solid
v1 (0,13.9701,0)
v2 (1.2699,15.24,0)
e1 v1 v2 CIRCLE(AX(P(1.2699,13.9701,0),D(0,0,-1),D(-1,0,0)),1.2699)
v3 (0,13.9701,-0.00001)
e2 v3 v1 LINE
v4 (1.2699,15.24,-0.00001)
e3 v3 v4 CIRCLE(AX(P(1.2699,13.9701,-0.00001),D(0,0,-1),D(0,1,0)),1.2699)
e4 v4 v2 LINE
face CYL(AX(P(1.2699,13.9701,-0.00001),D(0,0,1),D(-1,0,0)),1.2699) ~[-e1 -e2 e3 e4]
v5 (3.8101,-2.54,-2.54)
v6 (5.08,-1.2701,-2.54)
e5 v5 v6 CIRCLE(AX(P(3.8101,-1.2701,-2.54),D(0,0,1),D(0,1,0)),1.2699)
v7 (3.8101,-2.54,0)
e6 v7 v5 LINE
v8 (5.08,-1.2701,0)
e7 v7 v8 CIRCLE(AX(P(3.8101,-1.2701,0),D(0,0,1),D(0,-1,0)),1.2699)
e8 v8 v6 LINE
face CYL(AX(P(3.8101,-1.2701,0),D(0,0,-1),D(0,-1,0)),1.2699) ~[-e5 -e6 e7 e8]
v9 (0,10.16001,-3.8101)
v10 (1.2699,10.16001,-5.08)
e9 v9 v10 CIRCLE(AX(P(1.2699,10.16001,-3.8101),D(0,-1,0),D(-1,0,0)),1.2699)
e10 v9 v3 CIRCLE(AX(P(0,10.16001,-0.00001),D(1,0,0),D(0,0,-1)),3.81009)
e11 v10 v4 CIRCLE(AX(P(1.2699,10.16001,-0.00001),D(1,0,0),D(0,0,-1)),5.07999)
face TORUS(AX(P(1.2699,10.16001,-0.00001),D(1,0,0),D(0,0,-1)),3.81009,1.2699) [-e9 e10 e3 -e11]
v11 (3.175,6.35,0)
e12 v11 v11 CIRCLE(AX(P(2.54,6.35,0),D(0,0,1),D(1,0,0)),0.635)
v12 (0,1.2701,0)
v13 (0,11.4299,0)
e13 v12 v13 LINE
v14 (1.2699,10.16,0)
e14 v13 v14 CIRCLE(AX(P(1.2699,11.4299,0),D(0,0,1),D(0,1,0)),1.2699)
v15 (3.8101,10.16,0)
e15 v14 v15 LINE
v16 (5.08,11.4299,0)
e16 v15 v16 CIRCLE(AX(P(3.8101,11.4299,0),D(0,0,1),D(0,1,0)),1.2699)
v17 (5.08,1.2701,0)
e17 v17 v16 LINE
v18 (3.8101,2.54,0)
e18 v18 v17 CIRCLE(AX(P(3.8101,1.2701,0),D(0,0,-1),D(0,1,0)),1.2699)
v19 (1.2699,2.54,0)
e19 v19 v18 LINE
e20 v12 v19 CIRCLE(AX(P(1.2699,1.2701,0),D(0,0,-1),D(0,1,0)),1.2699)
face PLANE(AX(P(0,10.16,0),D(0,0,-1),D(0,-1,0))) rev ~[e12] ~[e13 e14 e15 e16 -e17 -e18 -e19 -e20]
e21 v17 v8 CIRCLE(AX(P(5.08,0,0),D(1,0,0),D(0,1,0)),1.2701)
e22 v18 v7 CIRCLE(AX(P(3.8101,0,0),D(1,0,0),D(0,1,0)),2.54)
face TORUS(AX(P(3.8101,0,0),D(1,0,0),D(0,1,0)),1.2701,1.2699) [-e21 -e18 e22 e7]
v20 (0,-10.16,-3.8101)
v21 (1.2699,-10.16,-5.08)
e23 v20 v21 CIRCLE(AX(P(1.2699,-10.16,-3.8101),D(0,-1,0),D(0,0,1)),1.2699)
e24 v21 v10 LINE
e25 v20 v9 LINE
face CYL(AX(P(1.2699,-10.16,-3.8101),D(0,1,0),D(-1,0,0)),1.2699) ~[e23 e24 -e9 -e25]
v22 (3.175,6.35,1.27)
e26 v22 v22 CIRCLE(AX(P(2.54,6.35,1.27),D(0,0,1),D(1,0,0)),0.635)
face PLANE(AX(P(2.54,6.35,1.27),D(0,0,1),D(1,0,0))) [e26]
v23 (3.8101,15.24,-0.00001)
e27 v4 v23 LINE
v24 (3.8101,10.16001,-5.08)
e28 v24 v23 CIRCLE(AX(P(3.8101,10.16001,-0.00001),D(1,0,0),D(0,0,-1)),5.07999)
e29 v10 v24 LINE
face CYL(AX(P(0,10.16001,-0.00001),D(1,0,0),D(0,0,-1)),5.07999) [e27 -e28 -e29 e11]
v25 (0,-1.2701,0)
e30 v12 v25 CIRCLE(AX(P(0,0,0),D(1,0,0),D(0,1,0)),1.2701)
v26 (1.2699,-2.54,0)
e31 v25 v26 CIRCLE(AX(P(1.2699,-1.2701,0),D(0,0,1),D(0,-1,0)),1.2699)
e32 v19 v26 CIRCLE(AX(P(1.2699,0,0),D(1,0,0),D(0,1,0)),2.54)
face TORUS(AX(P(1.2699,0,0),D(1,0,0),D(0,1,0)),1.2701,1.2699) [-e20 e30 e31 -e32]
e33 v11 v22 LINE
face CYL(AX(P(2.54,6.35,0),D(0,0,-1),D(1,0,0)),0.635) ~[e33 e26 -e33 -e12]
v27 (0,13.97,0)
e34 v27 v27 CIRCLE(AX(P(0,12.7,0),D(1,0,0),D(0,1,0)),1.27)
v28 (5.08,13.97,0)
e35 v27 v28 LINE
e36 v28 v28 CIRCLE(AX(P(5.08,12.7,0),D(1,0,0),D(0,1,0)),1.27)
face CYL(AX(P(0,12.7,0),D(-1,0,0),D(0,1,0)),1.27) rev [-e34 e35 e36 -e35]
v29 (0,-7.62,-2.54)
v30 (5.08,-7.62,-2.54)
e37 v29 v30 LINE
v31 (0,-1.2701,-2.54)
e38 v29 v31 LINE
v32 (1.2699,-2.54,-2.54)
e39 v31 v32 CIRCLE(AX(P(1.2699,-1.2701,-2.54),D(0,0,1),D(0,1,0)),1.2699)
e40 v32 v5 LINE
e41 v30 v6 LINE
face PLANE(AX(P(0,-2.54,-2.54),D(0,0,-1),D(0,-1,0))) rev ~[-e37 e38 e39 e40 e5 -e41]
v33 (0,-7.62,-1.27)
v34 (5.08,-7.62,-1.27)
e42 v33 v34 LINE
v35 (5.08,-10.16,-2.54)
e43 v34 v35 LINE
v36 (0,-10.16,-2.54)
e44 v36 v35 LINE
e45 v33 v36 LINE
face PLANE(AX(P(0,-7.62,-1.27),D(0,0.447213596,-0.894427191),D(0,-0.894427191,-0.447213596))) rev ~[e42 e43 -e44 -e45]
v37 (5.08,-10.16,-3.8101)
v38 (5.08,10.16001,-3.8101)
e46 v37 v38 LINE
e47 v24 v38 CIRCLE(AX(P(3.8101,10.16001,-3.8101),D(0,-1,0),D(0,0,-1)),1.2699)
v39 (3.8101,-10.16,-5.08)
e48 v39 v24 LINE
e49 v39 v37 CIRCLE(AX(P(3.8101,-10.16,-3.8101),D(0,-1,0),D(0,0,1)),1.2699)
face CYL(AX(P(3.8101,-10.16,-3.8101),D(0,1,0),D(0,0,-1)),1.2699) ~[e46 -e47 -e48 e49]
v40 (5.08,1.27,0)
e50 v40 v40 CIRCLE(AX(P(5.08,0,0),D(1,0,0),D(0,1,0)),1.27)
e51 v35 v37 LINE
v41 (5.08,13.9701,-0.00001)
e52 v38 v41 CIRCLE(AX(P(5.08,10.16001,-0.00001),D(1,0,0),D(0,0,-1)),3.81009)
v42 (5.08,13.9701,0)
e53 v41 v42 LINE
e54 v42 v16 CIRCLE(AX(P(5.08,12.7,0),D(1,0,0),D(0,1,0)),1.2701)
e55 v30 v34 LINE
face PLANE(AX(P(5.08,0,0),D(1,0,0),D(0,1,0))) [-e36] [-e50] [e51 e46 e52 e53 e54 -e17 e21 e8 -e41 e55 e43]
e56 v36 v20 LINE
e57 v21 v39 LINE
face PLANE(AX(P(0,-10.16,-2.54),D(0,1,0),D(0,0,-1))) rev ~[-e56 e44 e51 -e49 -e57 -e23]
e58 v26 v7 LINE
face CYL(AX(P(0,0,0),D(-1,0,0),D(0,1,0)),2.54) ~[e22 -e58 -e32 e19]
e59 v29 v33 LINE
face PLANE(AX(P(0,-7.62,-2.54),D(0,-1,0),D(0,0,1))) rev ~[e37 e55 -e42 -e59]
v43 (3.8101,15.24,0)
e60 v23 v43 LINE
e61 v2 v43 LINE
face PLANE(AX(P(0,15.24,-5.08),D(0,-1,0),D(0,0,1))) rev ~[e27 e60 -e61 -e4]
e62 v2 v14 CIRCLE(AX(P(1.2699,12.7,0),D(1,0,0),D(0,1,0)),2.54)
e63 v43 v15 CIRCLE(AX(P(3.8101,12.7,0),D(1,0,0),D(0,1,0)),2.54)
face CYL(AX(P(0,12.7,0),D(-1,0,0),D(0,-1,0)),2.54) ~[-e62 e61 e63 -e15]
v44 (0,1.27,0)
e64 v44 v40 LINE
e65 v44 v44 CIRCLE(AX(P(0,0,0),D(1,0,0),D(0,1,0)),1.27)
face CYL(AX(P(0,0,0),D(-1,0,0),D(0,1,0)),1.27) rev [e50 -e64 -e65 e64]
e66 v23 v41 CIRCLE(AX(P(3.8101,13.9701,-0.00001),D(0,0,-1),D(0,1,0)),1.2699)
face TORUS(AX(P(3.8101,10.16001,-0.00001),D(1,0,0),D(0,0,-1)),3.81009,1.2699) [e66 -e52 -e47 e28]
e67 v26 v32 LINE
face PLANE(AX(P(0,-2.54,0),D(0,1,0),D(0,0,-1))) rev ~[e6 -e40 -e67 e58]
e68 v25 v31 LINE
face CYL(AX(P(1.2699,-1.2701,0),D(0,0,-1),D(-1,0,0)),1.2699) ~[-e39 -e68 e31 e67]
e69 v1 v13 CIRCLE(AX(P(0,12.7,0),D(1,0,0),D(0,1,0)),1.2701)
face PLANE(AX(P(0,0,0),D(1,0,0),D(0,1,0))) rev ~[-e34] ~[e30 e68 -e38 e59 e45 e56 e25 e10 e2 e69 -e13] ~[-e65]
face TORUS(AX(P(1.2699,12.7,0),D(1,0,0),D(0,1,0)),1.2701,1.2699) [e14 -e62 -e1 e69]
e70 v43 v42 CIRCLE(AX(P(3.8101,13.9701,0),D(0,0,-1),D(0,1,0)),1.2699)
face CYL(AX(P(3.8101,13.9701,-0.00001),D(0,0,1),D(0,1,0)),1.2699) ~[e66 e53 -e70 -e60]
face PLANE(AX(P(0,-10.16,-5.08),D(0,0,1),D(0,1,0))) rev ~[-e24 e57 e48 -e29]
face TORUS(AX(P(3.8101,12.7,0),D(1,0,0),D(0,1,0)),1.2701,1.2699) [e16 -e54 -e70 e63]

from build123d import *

# Parameters (mm, degrees)
F0_R     = 1.27
F1_DEPTH = 5.08
F2_R     = 0.635
F3_DEPTH = 1.27
F4_R     = 5.07999
F5_R     = 1.2699


# Not quite as in the source:
# - a fillet or chamfer is up to 0.001 mm smaller than in the source, because OpenCascade refuses the exact size


with BuildPart() as f1:
    # F0 (on Right) → F1 (new body)
    with BuildSketch(Plane.YZ):
        with BuildLine():
            ThreePointArc((-2.54, 0), (0, -2.54), (2.54, 0))
            ThreePointArc((2.54, 0), (0, 2.54), (-2.54, 0))
        make_face()
        Circle(F0_R, mode=Mode.SUBTRACT)
        with BuildLine():
            Line((10.16, 0), (2.54, 0))
            ThreePointArc((2.54, 0), (0, -2.54), (-2.54, 0))
            Line((-2.54, 0), (-2.54, -2.54))
            Line((-2.54, -2.54), (-2.54, -5.08))
            Line((-2.54, -5.08), (15.24, -5.08))
            Line((15.24, -5.08), (15.24, 0))
            ThreePointArc((15.24, 0), (12.7, -2.54), (10.16, 0))
        make_face()
        with BuildLine():
            ThreePointArc((15.24, 0), (12.7, 2.54), (10.16, 0))
            ThreePointArc((10.16, 0), (12.7, -2.54), (15.24, 0))
        make_face()
        with Locations((12.7, 0)):
            Circle(F0_R, mode=Mode.SUBTRACT)
        Polygon((-2.54, -5.08), (-2.54, -2.54), (-7.62, -2.54), (-10.16, -2.54), (-10.16, -5.08), align=None)
        Polygon((-10.16, -2.54), (-7.62, -2.54), (-7.62, -1.27), align=None)
    extrude(amount=F1_DEPTH)

    # F2 (on face) → F3 (join)
    with BuildSketch(Plane.XY):
        with Locations((2.54, 6.35)):
            Circle(F2_R)
    extrude(amount=F3_DEPTH)

    # F4 (radius 5.08 in the source; OpenCascade refuses exactly that, so slightly less here)
    f4_edges = [f1.edges().sort_by_distance(p)[0] for p in [
        (2.54, 15.24, -5.08),
    ]]
    fillet(f4_edges, radius=F4_R)

    # F5 (radius 1.27 in the source; OpenCascade refuses exactly that, so slightly less here)
    f5_edges = [f1.edges().sort_by_distance(p)[0] for p in [
        (5.08, 13.752105, -3.592105),
        (0, 13.752105, -3.592105),
        (5.08, 0, 2.54),
        (0, 0, 2.54),
    ]]
    fillet(f5_edges, radius=F5_R)


solid = f1.part
